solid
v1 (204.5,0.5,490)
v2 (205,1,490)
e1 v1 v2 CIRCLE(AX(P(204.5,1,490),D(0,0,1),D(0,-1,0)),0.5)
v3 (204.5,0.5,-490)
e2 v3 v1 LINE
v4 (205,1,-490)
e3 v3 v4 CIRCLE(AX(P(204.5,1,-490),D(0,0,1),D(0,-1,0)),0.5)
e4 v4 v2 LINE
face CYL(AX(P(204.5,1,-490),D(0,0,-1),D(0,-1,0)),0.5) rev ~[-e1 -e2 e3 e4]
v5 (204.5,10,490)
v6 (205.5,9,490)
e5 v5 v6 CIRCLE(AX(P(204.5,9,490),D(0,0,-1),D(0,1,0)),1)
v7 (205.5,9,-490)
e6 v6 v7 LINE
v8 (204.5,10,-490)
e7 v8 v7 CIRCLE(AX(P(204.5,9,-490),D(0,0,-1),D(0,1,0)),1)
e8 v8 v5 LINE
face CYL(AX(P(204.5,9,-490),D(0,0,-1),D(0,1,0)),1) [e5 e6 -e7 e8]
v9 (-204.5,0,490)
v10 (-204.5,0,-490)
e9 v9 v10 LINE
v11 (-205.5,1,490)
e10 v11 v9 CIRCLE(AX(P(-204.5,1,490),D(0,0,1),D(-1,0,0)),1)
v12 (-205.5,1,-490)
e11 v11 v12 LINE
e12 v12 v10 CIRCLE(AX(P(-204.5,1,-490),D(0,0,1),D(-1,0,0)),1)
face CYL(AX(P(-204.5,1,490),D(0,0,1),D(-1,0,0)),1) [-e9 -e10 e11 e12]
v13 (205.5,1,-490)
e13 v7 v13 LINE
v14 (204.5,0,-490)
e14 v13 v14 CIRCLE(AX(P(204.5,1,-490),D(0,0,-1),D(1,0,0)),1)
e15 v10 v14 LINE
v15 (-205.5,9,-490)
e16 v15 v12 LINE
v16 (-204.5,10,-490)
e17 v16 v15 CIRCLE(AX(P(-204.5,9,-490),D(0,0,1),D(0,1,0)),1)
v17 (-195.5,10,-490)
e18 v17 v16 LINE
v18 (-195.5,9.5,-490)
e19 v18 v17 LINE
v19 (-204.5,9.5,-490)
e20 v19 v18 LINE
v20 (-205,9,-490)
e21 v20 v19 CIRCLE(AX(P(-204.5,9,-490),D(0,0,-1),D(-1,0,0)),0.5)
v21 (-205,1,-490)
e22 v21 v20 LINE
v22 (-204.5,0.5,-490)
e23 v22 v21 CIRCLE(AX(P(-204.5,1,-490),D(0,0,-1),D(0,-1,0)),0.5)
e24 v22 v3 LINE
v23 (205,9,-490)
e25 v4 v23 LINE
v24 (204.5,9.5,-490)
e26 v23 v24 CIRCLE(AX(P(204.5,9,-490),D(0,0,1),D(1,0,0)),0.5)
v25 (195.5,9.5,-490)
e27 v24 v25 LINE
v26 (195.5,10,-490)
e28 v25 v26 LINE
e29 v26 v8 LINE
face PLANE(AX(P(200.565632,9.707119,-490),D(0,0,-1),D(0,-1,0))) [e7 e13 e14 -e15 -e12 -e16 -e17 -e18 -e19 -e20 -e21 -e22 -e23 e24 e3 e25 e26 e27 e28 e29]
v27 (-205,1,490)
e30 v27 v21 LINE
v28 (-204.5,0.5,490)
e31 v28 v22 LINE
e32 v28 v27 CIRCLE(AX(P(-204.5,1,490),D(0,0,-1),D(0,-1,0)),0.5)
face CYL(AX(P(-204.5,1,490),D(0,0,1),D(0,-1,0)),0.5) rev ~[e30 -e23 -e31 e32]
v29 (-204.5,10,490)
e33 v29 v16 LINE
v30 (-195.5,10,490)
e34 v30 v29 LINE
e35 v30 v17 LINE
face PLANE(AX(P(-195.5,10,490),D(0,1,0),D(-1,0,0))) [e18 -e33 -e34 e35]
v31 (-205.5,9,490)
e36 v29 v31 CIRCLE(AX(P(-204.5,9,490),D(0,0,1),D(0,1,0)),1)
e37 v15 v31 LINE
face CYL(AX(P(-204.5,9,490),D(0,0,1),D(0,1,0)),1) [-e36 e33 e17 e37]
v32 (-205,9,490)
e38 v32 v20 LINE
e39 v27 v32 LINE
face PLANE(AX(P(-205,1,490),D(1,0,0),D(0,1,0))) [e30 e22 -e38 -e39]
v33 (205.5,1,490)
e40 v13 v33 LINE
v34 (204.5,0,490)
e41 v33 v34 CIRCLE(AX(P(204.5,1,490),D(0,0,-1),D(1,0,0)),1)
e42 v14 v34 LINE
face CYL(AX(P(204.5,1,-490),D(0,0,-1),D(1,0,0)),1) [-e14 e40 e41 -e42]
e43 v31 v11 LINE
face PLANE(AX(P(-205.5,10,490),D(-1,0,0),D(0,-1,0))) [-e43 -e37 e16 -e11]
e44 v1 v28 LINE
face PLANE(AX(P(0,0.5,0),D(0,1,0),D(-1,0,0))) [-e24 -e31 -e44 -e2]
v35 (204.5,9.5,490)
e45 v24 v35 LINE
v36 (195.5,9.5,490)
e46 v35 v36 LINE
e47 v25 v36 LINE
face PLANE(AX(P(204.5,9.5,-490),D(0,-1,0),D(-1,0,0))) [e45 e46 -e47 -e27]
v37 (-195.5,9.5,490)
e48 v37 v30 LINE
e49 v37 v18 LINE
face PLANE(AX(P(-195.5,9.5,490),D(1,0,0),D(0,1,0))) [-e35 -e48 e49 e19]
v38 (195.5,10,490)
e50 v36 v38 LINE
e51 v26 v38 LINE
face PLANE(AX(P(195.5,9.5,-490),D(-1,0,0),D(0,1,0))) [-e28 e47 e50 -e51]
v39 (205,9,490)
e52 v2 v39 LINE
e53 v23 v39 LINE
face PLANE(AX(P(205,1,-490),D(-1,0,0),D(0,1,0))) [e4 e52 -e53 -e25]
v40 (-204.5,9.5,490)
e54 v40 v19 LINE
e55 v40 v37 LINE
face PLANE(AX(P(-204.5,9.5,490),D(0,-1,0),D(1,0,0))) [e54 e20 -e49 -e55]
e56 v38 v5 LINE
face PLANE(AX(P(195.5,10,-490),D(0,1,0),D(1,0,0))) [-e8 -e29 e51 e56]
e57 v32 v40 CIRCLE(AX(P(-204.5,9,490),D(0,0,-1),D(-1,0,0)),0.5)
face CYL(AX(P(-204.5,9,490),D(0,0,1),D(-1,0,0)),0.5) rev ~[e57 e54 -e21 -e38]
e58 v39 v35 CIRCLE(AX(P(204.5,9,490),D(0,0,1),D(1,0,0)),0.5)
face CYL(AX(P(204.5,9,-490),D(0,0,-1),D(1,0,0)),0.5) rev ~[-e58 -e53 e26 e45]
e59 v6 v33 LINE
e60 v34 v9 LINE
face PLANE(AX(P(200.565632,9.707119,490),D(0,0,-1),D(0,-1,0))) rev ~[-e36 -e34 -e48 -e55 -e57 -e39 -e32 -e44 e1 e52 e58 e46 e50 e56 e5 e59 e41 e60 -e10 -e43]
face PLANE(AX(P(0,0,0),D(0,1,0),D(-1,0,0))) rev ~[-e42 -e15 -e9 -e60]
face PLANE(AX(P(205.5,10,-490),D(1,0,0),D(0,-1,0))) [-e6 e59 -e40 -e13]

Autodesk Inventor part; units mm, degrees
ref_plane "YZ Plane" through (0, 0, 0) normal (1, 0, 0) x (0, 1, 0)
ref_plane "XZ Plane" through (0, 0, 0) normal (0, 1, 0) x (-1, 0, 0)
ref_plane "XY Plane" through (0, 0, 0) normal (0, 0, 1) x (1, 0, 0)
sketch "Sketch6" plane through (0, 0, 0) normal (0, 1, 0) x (-1, 0, 0)
  line L0 (205.5, -490) -> (-205.5, -490)
  line L1 (-205.5, -490) -> (-205.5, 490)
  line L2 (-205.5, 490) -> (205.5, 490)
  line L3 (205.5, 490) -> (205.5, -490)
  line L4 (205.5, -490) -> (-205.5, 490) construction
  line L5 (-205.5, -490) -> (205.5, 490) construction
  point P0 (0, 0)
  dimension "d52" = 411
  dimension "d53" = 980
extrude "Plate2" add sketch "Sketch6" along normal blind 0.5
sketch "Sketch11" plane through (-205, 0, 490) normal (-1, 0, 0) x (0, -1, 0)
  line L0 (0, -980) -> (0, 0)
  line L1 (0, 0) -> (-10, 0)
  line L2 (-10, 0) -> (-10, -980)
  line L3 (-10, -980) -> (0, -980)
edge flange "Flange2" height 10 angle 90 thickness 0.5 bend radius 0.5 thickness toward (-1, 0, 0) relief tear relief width 0.5 relief depth 0.25 edges at (-205.5, 0.5, 0) wall of the first edge with corners at (-205, 0, -490) (-205, 0, 490) (-205, 10, 490) (-205, 10, -490)
bend "Bend3"
corner "Corner3"
sketch "Sketch12" plane through (-205.5, 9.5, 490) normal (0, 1, 0) x (-1, 0, 0)
  line L0 (0, -980) -> (0, 0)
  line L1 (0, 0) -> (-10, 0)
  line L2 (-10, 0) -> (-10, -980)
  line L3 (-10, -980) -> (0, -980)
edge flange "Flange3" height 10 angle 90 thickness 0.5 bend radius 0.5 thickness toward (0, 1, 0) relief tear relief width 0.5 relief depth 0.25 edges at (-205, 10, 0) wall of the first edge with corners at (-205.5, 9.5, -490) (-205.5, 9.5, 490) (-195.5, 9.5, 490) (-195.5, 9.5, -490)
bend "Bend4"
corner "Corner4"
sketch "Sketch13" plane through (205, 0, -490) normal (1, 0, 0) x (0, 1, 0)
  line L0 (0, 980) -> (0, 0)
  line L1 (0, 0) -> (10, 0)
  line L2 (10, 0) -> (10, 980)
  line L3 (10, 980) -> (0, 980)
edge flange "Flange4" height 10 angle 90 thickness 0.5 bend radius 0.5 thickness toward (1, 0, 0) relief tear relief width 0.5 relief depth 0.25 edges at (205.5, 0.5, 0) wall of the first edge with corners at (205, 0, 490) (205, 0, -490) (205, 10, -490) (205, 10, 490)
bend "Bend5"
corner "Corner5"
sketch "Sketch14" plane through (205.5, 9.5, -490) normal (0, 1, 0) x (-1, 0, 0)
  line L0 (0, 980) -> (0, 0)
  line L1 (0, 0) -> (10, 0)
  line L2 (10, 0) -> (10, 980)
  line L3 (10, 980) -> (0, 980)
edge flange "Flange5" height 10 angle 90 thickness 0.5 bend radius 0.5 thickness toward (0, 1, 0) relief tear relief width 0.5 relief depth 0.25 edges at (205, 10, 0) wall of the first edge with corners at (205.5, 9.5, 490) (205.5, 9.5, -490) (195.5, 9.5, -490) (195.5, 9.5, 490)
bend "Bend6"
corner "Corner6"
equation "\"d52\" = ЖАБРЫ_базовая_ширина - 5 * ЖАБРЫ_шаг_листов"
equation "\"d53\" = ЖАБРЫ_базовая_длина_кор_лист"
equation "\"d54\" = Thickness"
equation "\"d84\" = BendReliefWidth"
equation "\"d85\" = BendReliefDepth"
equation "\"d86\" = MinimumRemnant"
equation "\"d87\" = TransitionRadius"
equation "\"d90\" = BendRadius"
equation "\"d91\" = CornerReliefSize"
equation "\"d92\" = GapSize"
equation "\"d93\" = JacobiRadiusSize"
equation "\"d94\" = BendReliefWidth"
equation "\"d95\" = BendReliefDepth"
equation "\"d96\" = MinimumRemnant"
equation "\"d97\" = TransitionRadius"
equation "\"d100\" = BendRadius"
equation "\"d101\" = CornerReliefSize"
equation "\"d102\" = GapSize"
equation "\"d103\" = JacobiRadiusSize"
equation "\"d104\" = BendReliefWidth"
equation "\"d105\" = BendReliefDepth"
equation "\"d106\" = MinimumRemnant"
equation "\"d107\" = TransitionRadius"
equation "\"d110\" = BendRadius"
equation "\"d111\" = CornerReliefSize"
equation "\"d112\" = GapSize"
equation "\"d113\" = JacobiRadiusSize"
equation "\"d114\" = BendReliefWidth"
equation "\"d115\" = BendReliefDepth"
equation "\"d116\" = MinimumRemnant"
equation "\"d117\" = TransitionRadius"
equation "\"d120\" = BendRadius"
equation "\"d121\" = CornerReliefSize"
equation "\"d122\" = GapSize"
equation "\"d123\" = JacobiRadiusSize"
equation "\"BendRadius\" = Thickness"
equation "\"BendReliefWidth\" = Thickness"
equation "\"BendReliefDepth\" = 0.5 * Thickness"
equation "\"CornerReliefSize\" = 4 * Thickness"
equation "\"MinimumRemnant\" = 2 * Thickness"
equation "\"TransitionRadius\" = BendRadius"
equation "\"JacobiRadiusSize\" = BendRadius"
equation "\"GapSize\" = Thickness"
equation "\"ЖАБРЫ_базовая_ширина\" = 915"
equation "\"ЖАБРЫ_шаг_листов\" = 100.8"
equation "\"ЖАБРЫ_базовая_длина_кор_лист\" = 980"
equation "\"Thickness\" = 0.5"
properties part number "MSC 811 sheet gills" material "Stainless Steel"
